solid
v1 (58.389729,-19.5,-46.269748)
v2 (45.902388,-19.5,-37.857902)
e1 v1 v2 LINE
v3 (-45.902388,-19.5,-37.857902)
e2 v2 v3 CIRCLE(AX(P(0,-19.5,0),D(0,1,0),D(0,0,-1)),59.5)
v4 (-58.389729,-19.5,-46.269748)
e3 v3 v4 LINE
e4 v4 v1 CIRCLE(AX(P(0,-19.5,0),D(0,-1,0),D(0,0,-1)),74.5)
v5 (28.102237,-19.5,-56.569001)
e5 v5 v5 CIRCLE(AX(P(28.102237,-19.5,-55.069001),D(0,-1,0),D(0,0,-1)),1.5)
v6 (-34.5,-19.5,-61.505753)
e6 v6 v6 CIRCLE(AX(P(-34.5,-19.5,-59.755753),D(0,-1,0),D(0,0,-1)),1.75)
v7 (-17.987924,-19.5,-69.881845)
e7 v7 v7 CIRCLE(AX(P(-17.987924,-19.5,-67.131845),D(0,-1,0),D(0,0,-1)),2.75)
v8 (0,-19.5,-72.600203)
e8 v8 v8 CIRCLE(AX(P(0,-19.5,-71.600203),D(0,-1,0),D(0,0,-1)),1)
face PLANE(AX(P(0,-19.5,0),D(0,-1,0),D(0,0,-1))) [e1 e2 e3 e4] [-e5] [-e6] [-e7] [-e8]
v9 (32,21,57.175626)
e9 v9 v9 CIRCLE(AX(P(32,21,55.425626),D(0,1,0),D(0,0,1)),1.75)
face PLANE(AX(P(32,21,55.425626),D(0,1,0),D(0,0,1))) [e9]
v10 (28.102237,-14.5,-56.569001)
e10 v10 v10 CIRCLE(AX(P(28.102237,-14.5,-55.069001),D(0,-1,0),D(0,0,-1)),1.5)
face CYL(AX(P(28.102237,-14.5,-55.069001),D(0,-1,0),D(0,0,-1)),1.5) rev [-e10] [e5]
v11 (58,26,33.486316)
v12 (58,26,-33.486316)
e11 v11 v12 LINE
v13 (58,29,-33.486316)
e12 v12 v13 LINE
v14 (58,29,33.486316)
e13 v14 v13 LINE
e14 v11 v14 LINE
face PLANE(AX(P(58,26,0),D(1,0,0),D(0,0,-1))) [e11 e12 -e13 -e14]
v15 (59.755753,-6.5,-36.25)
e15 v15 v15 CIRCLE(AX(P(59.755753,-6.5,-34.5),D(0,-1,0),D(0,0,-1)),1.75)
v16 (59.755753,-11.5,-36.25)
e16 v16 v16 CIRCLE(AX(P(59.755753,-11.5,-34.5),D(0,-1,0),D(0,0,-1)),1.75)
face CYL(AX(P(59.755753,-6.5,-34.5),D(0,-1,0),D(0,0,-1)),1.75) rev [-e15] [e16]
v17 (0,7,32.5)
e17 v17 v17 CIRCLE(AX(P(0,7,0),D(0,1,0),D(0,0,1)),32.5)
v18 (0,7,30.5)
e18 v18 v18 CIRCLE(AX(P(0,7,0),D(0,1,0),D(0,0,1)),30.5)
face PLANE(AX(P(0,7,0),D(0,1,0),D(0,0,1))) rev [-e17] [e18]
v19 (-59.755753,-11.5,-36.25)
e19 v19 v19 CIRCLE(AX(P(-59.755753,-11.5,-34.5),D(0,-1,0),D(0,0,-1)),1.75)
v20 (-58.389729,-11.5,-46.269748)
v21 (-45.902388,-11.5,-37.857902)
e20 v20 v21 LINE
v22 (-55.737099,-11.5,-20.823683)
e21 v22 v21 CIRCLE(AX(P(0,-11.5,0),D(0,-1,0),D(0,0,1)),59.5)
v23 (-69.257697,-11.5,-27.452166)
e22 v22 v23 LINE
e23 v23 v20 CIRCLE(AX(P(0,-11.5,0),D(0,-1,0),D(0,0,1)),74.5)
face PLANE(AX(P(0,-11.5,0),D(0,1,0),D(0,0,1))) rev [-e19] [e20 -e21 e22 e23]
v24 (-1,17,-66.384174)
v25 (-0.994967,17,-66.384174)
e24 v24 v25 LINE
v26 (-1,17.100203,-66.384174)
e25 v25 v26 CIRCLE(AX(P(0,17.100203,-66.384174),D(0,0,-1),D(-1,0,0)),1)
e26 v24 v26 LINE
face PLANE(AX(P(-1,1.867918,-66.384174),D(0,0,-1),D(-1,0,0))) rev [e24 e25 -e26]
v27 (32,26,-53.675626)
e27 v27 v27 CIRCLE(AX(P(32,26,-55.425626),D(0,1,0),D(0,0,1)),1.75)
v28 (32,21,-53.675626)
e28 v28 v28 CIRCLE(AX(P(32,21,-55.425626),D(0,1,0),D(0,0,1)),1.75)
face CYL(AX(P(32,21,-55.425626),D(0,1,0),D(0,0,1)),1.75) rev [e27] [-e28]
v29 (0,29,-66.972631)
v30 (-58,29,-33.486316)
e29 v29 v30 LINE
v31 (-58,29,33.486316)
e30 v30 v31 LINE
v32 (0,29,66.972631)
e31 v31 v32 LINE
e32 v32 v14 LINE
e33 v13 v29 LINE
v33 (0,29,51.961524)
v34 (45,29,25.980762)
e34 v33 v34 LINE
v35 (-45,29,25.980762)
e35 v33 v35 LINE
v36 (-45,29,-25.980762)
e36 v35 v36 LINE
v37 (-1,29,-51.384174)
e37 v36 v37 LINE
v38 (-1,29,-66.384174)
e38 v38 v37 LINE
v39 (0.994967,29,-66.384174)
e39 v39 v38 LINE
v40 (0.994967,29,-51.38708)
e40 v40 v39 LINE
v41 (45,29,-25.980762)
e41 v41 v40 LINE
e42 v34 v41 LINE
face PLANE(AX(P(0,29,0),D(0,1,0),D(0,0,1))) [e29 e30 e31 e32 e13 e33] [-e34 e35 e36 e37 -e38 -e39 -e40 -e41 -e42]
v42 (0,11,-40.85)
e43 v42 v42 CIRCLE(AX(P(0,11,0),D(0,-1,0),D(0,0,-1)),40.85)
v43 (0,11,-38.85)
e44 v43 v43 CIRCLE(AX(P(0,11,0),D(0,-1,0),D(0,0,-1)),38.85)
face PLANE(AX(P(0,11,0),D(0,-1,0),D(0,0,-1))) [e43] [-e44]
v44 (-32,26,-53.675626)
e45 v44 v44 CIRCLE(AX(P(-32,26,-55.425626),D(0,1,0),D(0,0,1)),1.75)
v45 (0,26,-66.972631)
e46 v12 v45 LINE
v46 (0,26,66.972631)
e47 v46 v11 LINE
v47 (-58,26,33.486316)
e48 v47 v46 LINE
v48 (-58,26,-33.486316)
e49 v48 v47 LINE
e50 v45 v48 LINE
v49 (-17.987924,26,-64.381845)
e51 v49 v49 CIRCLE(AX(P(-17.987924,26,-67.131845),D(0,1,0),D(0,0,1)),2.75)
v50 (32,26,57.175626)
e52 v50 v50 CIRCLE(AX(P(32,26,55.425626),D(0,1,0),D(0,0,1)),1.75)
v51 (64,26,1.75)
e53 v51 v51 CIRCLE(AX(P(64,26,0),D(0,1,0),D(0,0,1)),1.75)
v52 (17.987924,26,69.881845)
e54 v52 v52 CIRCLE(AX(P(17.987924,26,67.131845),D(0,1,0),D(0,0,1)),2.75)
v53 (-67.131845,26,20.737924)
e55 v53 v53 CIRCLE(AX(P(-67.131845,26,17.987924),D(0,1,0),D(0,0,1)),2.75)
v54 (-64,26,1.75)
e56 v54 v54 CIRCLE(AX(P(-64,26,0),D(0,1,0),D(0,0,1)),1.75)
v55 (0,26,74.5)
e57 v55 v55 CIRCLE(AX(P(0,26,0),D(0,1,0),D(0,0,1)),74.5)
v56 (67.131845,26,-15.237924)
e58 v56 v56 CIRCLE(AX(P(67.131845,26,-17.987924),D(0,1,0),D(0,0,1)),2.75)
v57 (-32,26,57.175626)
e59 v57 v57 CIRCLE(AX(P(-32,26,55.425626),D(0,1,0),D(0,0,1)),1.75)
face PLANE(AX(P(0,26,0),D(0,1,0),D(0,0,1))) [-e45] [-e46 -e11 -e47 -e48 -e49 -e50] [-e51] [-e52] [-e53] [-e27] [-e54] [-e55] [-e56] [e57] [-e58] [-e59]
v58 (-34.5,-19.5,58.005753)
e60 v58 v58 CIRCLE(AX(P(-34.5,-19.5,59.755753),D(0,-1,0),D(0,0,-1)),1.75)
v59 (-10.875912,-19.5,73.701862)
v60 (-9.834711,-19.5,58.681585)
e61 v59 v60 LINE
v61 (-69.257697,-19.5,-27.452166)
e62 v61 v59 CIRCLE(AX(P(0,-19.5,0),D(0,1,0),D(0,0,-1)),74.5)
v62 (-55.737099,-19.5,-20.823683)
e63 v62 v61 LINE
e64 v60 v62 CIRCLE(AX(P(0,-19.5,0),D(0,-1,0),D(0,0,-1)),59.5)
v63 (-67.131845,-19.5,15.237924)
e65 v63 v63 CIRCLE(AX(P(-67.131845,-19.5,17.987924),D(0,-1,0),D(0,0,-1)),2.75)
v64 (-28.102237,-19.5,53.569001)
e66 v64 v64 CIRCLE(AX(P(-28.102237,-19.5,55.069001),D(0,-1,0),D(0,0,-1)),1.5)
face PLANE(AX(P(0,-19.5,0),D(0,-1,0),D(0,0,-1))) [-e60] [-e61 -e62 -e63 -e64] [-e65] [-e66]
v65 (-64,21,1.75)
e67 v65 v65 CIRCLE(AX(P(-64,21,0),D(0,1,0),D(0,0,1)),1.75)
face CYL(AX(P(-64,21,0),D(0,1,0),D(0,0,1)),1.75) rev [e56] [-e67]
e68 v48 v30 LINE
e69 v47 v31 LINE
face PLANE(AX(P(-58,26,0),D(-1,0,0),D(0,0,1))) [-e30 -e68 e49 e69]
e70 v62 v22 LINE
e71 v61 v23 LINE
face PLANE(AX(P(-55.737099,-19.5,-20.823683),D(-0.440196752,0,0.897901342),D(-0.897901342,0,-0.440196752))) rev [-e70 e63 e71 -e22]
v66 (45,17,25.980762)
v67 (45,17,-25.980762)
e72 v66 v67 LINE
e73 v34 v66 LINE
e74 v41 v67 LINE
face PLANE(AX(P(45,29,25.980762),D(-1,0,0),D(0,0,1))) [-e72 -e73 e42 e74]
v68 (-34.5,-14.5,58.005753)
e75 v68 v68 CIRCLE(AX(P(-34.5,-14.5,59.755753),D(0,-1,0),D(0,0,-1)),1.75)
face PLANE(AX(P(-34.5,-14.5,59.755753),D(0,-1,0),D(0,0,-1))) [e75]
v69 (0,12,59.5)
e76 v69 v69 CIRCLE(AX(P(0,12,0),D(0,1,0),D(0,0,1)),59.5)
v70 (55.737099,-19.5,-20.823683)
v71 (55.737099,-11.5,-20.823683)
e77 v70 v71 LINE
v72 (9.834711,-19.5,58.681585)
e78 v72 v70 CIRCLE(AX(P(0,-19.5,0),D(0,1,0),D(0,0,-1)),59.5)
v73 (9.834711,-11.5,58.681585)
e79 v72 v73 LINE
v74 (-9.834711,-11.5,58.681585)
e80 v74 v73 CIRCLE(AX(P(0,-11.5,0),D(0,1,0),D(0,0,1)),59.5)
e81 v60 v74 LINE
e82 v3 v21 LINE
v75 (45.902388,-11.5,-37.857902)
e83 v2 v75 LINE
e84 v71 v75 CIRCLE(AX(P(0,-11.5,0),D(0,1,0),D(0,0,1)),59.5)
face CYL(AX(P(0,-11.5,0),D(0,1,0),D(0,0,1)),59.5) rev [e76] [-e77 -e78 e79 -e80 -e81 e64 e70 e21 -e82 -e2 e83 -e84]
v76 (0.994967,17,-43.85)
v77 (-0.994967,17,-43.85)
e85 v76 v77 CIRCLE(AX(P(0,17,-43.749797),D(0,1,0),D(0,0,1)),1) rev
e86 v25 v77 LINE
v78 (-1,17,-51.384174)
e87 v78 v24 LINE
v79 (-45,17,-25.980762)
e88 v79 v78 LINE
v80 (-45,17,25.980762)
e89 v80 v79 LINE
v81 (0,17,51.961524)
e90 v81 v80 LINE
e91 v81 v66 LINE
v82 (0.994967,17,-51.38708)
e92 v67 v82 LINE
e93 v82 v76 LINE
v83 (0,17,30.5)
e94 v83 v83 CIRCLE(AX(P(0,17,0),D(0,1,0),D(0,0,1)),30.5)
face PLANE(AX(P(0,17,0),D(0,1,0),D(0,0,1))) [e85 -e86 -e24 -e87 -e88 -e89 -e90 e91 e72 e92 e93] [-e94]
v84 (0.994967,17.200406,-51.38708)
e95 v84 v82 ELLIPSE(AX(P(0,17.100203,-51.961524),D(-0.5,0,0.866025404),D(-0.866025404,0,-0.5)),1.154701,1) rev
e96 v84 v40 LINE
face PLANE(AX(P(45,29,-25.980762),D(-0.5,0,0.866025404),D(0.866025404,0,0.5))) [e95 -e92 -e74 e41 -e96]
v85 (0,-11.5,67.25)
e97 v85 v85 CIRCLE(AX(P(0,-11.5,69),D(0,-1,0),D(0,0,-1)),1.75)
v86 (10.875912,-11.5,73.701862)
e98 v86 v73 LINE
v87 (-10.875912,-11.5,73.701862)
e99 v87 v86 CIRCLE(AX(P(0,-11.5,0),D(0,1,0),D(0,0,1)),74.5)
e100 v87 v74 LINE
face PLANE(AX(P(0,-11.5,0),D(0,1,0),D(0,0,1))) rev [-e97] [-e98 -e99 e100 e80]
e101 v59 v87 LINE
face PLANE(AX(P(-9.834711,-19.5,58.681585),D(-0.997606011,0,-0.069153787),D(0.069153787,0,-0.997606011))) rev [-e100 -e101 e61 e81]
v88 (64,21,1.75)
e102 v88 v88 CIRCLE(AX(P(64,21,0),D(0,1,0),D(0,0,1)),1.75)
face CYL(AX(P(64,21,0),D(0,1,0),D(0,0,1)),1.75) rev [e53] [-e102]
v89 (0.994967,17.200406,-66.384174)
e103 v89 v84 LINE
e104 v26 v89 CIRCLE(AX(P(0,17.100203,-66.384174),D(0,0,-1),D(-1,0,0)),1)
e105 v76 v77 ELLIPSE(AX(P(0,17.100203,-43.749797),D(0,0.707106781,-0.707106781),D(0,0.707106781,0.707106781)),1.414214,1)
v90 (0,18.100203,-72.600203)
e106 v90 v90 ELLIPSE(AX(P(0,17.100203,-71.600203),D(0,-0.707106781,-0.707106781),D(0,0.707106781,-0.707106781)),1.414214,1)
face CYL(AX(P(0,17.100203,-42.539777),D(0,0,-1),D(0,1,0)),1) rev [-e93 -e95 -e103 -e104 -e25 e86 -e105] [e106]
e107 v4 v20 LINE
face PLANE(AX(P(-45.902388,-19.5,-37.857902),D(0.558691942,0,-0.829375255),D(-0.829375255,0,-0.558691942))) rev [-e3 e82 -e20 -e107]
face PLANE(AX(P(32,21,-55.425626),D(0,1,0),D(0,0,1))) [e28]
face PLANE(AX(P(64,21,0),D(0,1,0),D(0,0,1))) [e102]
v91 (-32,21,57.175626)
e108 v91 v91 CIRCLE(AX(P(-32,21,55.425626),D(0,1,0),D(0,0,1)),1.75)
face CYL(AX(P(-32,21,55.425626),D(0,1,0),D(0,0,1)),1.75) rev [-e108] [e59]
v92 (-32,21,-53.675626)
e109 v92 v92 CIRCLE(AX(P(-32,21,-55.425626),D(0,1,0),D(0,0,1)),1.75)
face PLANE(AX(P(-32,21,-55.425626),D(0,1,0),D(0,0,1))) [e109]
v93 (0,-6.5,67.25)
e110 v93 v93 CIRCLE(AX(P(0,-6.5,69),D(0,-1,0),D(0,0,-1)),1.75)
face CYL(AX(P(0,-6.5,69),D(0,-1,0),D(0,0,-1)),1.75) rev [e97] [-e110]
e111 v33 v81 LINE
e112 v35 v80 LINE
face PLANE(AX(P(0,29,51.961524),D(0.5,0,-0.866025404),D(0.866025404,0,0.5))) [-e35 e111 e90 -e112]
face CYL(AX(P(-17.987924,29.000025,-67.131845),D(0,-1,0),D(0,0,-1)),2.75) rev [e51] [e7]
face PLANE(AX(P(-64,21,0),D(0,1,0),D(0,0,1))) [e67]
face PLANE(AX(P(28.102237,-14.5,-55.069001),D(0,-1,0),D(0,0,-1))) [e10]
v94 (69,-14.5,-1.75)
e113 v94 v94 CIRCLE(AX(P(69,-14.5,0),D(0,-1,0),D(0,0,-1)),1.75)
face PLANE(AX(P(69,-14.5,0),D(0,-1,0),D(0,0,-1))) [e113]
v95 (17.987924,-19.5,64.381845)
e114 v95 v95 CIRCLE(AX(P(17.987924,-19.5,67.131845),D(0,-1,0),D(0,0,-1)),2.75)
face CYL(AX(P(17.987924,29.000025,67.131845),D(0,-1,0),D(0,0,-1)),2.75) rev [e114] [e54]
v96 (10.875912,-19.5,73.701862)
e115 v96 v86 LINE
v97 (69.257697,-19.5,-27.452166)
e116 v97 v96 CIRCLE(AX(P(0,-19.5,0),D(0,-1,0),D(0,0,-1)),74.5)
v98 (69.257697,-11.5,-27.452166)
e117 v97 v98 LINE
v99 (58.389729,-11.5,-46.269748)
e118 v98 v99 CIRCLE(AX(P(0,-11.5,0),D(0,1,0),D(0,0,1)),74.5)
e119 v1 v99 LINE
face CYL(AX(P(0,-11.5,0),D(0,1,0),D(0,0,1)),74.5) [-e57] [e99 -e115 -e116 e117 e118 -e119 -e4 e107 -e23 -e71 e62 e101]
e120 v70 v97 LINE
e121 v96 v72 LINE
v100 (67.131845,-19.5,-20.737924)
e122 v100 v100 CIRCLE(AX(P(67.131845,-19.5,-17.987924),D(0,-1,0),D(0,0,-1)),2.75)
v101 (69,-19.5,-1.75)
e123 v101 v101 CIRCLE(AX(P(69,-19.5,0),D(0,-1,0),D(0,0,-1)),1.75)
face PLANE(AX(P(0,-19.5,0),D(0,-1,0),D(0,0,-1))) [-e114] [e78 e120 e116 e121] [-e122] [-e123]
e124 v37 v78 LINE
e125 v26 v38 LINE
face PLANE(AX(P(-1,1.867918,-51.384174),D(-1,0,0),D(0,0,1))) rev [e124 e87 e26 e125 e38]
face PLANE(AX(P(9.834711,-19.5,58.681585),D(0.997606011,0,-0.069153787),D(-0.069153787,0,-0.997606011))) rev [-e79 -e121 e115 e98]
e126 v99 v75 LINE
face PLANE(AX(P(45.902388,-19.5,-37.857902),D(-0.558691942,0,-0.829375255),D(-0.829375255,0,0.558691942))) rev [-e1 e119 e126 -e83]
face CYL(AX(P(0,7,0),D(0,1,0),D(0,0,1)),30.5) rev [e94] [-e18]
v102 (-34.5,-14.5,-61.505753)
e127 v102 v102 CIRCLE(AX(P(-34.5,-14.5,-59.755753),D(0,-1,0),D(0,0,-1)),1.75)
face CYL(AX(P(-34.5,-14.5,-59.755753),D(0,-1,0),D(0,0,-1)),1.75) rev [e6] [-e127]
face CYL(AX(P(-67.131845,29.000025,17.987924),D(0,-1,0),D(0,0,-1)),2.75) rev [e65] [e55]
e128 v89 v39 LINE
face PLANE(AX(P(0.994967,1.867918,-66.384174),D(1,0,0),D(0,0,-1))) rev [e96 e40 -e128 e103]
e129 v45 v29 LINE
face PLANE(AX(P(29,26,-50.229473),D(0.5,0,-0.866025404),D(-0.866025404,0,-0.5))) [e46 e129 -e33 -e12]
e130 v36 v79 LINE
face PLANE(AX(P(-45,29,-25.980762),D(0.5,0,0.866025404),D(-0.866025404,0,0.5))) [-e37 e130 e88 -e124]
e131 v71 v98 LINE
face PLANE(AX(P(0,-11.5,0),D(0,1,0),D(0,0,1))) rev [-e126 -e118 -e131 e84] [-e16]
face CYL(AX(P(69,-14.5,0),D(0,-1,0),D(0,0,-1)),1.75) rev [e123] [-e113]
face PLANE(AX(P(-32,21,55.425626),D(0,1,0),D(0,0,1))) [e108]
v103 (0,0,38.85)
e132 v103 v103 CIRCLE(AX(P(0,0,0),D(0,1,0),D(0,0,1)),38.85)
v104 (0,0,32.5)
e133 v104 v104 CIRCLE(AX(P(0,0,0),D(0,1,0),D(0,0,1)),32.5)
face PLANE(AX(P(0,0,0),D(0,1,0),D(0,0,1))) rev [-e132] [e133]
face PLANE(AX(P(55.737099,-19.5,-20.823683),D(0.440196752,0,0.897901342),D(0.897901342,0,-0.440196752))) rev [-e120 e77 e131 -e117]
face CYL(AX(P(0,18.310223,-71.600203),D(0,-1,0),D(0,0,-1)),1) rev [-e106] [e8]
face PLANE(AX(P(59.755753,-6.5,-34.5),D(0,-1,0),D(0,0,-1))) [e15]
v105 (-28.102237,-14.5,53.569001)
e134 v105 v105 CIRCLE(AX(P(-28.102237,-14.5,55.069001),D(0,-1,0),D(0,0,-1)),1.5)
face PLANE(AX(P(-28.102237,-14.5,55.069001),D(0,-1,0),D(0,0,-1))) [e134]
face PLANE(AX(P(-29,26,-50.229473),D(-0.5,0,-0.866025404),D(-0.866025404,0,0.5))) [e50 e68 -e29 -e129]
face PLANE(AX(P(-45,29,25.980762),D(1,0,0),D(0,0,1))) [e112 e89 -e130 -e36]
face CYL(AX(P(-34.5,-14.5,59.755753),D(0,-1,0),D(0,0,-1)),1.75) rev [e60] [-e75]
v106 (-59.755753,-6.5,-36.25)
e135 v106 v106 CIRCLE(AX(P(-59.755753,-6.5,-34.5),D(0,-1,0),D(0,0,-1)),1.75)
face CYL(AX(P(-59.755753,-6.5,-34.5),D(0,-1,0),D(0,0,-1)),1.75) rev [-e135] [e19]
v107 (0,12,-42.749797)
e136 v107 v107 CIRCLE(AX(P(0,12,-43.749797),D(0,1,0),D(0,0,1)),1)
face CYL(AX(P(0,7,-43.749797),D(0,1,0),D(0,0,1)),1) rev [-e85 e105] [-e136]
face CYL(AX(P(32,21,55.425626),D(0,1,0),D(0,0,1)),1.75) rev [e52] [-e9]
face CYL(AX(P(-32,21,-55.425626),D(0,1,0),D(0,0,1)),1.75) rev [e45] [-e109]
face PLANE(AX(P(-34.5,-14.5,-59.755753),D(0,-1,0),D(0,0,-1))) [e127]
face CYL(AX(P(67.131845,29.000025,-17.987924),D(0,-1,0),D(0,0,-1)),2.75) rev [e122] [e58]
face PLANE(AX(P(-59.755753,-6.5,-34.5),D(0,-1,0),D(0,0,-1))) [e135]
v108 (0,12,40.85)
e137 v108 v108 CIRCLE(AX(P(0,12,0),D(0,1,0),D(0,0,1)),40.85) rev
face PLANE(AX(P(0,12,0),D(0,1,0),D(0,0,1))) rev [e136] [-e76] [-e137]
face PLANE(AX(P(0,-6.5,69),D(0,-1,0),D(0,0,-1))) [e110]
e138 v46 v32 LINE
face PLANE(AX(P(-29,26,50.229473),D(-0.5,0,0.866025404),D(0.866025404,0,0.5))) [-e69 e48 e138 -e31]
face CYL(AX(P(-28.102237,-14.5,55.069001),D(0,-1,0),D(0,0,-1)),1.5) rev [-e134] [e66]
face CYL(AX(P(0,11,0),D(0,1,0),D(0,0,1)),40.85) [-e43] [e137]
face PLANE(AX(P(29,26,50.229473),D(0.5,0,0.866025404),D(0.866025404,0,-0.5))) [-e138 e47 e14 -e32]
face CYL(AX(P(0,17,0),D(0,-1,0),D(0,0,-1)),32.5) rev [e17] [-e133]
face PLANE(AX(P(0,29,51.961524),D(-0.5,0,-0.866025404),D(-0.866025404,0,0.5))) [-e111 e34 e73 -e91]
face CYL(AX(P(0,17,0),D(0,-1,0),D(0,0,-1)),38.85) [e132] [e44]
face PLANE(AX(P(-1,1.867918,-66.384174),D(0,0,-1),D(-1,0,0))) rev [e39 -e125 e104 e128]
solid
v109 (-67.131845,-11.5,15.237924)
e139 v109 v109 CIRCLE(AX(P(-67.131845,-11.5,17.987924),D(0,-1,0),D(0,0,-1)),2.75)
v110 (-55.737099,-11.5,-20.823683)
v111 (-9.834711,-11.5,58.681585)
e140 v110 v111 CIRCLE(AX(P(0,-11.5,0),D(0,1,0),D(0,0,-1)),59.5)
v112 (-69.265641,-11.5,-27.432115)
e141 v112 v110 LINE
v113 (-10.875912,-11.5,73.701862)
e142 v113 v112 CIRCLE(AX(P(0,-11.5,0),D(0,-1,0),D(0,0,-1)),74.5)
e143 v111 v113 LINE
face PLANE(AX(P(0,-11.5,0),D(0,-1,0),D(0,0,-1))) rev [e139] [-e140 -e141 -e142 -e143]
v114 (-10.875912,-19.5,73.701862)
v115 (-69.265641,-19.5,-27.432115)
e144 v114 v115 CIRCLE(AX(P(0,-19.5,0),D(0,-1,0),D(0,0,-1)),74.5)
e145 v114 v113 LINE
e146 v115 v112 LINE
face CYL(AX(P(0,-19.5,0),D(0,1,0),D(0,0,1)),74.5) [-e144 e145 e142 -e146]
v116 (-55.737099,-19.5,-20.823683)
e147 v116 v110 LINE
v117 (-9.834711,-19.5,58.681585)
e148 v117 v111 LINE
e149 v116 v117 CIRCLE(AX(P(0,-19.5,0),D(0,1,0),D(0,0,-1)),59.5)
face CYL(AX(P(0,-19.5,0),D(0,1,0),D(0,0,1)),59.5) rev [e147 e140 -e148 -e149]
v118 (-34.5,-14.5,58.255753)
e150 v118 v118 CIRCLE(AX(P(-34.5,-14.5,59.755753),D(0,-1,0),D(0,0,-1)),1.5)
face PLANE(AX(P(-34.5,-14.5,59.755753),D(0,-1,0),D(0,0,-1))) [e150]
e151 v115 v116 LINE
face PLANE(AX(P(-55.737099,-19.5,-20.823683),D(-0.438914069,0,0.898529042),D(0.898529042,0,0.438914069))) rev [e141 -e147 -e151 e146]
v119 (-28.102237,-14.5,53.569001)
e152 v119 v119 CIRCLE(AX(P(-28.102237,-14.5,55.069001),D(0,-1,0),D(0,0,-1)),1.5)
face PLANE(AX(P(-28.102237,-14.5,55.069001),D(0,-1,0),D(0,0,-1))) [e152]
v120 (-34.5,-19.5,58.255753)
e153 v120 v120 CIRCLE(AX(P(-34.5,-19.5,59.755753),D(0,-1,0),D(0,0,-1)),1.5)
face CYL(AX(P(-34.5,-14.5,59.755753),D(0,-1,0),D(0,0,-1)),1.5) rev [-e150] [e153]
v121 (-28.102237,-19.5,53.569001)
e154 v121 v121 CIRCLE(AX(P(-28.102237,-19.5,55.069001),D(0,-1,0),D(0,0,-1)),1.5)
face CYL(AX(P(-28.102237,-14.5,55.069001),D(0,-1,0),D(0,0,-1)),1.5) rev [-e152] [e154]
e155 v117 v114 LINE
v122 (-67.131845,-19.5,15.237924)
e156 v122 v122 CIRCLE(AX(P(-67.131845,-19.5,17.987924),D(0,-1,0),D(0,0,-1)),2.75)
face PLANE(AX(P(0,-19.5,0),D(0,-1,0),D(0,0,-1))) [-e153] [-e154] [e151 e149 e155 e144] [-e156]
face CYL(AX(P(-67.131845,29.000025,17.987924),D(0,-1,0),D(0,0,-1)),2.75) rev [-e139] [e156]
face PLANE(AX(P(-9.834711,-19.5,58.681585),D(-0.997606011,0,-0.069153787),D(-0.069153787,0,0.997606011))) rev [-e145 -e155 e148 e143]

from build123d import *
from build123d.topology import SkipClean

# Parameters (mm, degrees)
CROQUIS1_R                 = 38.85
CROQUIS1_R_2               = 32.5
SALIENTE_EXTRUIR1_DEPTH    = 17
CROQUIS3_R                 = 59.5
CROQUIS3_R_2               = 38.85
SALIENTE_EXTRUIR2_DEPTH    = 5
CROQUIS4_R                 = 74.5
CROQUIS4_R_2               = 59.5
SALIENTE_EXTRUIR3_DEPTH    = 28.5
SALIENTE_EXTRUIR4_START    = 12
CROQUIS5_R                 = 74.5
SALIENTE_EXTRUIR4_DEPTH    = 12
CROQUIS6_R                 = 32.5
CROQUIS6_R_2               = 30.5
SALIENTE_EXTRUIR5_DEPTH    = 10
SALIENTE_EXTRUIR6_START    = 1
CROQUIS9_R                 = 40.85
CROQUIS9_R_2               = 38.85
SALIENTE_EXTRUIR6_DEPTH    = 1
CORTAR_EXTRUIR1_DEPTH      = 110.277170534
CORTAR_EXTRUIR1_DEPTH_BACK = 110.277170534
SALIENTE_EXTRUIR7_DEPTH    = 8
CROQUIS12_R                = 1
CROQUIS14_R                = 1.75
CORTAR_EXTRUIR2_DEPTH      = 5
CROQUIS15_R                = 74.5
CROQUIS15_R_2              = 32
CORTAR_EXTRUIR4_DEPTH      = 3
CROQUIS16_R                = 1.75
CORTAR_EXTRUIR5_DEPTH      = 5
CROQUIS18_R                = 1.75
CORTAR_EXTRUIR6_DEPTH      = 5
CORTAR_EXTRUIR7_START      = -12
CORTAR_EXTRUIR7_DEPTH      = 12
CROQUIS21_R                = 1.5
CORTAR_EXTRUIR8_DEPTH      = 5
CROQUIS22_R                = 2.75
CORTAR_EXTRUIR9_DEPTH      = 116.985990533
SKETCH1_R                  = 1.5
CUT_EXTRUDE1_DEPTH         = 5


# Read off the part's stored shape, not the designer's step: Cortar-Extruir7
with BuildPart() as part:
    # Croquis1 → Saliente-Extruir1 (new body)
    with BuildSketch(Plane(origin=(0, 0, 0), x_dir=(1, 0, 0), z_dir=(0, 1, 0))):
        with Locations(Location((0, 0, 0), (0, 0, 270))):
            Circle(CROQUIS1_R)
        with Locations(Location((0, 0, 0), (0, 0, 270))):
            Circle(CROQUIS1_R_2, mode=Mode.SUBTRACT)
    extrude(amount=SALIENTE_EXTRUIR1_DEPTH)



with BuildPart() as body_2:
    # Croquis3 → Saliente-Extruir2 (new body)
    with BuildSketch(Plane(origin=(0, 17, 0), x_dir=(1, 0, 0), z_dir=(0, 1, 0))):
        with Locations(Location((0, 0, 0), (0, 0, 270))):
            Circle(CROQUIS3_R)
        with Locations(Location((0, 0, 0), (0, 0, 270))):
            Circle(CROQUIS3_R_2, mode=Mode.SUBTRACT)
    extrude(amount=-SALIENTE_EXTRUIR2_DEPTH)


with BuildPart() as part_1:
    add(part.part)

    add(body_2.part)  # Saliente-Extruir3 merges body 2
    # Croquis4 → Saliente-Extruir3 (add)
    with BuildSketch(Plane(origin=(0, 17, 0), x_dir=(1, 0, 0), z_dir=(0, 1, 0))):
        with Locations(Location((0, 0, 0), (0, 0, 270))):
            Circle(CROQUIS4_R)
        with Locations(Location((0, 0, 0), (0, 0, 270))):
            Circle(CROQUIS4_R_2, mode=Mode.SUBTRACT)
    extrude(amount=-SALIENTE_EXTRUIR3_DEPTH)

    # Croquis5 → Saliente-Extruir4 (add)
    with BuildSketch(Plane(origin=(0, 17, 0), x_dir=(1, 0, 0), z_dir=(0, 1, 0)).offset(SALIENTE_EXTRUIR4_START)):
        with Locations(Location((0, 0, 0), (0, 0, 270))):
            Circle(CROQUIS5_R)
        Polygon((0, 51.961524227), (-45, 25.980762114), (-45, -25.980762114), (0, -51.961524227), (45, -25.980762114), (45, 25.980762114), align=None, mode=Mode.SUBTRACT)
    extrude(amount=-SALIENTE_EXTRUIR4_DEPTH)


with BuildPart() as body_2_2:
    # Croquis6 → Saliente-Extruir5 (new body)
    with BuildSketch(Plane(origin=(0, 17, 0), x_dir=(1, 0, 0), z_dir=(0, 1, 0))):
        with Locations(Location((0, 0, 0), (0, 0, 270))):
            Circle(CROQUIS6_R)
        with Locations(Location((0, 0, 0), (0, 0, 270))):
            Circle(CROQUIS6_R_2, mode=Mode.SUBTRACT)
    extrude(amount=-SALIENTE_EXTRUIR5_DEPTH)


    add(part_1.part)  # Saliente-Extruir6 merges part
    # Croquis9 → Saliente-Extruir6 (add)
    with BuildSketch(Plane(origin=(0, 12, 0), x_dir=(-1, 0, 0), z_dir=(0, -1, 0)).offset(SALIENTE_EXTRUIR6_START)):
        with Locations(Location((0, 0, 0), (0, 0, 270))):
            Circle(CROQUIS9_R)
        with Locations(Location((0, 0, 0), (0, 0, 90))):
            Circle(CROQUIS9_R_2, mode=Mode.SUBTRACT)
    extrude(amount=-SALIENTE_EXTRUIR6_DEPTH)

    # Croquis10 → Cortar-Extruir1 (cut, two sides: drawn at the far end of the back side and taken through both)
    with BuildSketch(Plane.XZ.offset(-CORTAR_EXTRUIR1_DEPTH_BACK)):
        with BuildLine():
            Line((0, 0), (0, 93.15188238))
            ThreePointArc((0, 93.15188238), (-93.15188238, 0), (0, -93.15188238))
            Line((0, -93.15188238), (0, 0))
        make_face()
    extrude(amount=CORTAR_EXTRUIR1_DEPTH + CORTAR_EXTRUIR1_DEPTH_BACK, mode=Mode.SUBTRACT)

    # Croquis17 → Saliente-Extruir7 (add)
    with SkipClean():  # the faces are left unmerged after this step: merging them gives an invalid solid
        with BuildSketch(Plane(origin=(0, -11.5, 0), x_dir=(-1, 0, 0), z_dir=(0, -1, 0))):
            with BuildLine():
                Line((55.737099059, 20.823683355), (69.265641396, 27.432114792))
                ThreePointArc((69.265641396, 27.432114792), (64.518892582, -37.25), (10.875912409, -73.701862455))
                Line((10.875912409, -73.701862455), (9.834710744, -58.681585396))
                ThreePointArc((9.834710744, -58.681585396), (51.528511525, -29.75), (55.737099059, 20.823683355))
            make_face()
            with BuildLine():
                Line((45.902388315, 37.857902041), (58.389728988, 46.269747663))
                ThreePointArc((58.389728988, 46.269747663), (0, 74.5), (-58.389728988, 46.269747663))
                Line((-58.389728988, 46.269747663), (-45.902388315, 37.857902041))
                ThreePointArc((-45.902388315, 37.857902041), (0, 59.5), (45.902388315, 37.857902041))
            make_face()
            with BuildLine():
                Line((-55.737099059, 20.823683355), (-69.257696989, 27.452165812))
                ThreePointArc((-69.257696989, 27.452165812), (-64.524283781, -37.240660609), (-10.875912409, -73.701862455))
                Line((-10.875912409, -73.701862455), (-9.834710744, -58.681585396))
                ThreePointArc((-9.834710744, -58.681585396), (-51.528511525, -29.75), (-55.737099059, 20.823683355))
            make_face()
        extrude(amount=SALIENTE_EXTRUIR7_DEPTH)


with BuildPart() as saliente_extruir7_piece_1:
    # of the separate pieces the step leaves, piece 1, a body of its own (saliente_extruir7_pieces)
    add(body_2_2.part.solids().sort_by_distance((0, 17, 51.961524227))[0])

    # Cortar-Barrer1: sweep along a path in Croquis11
    with SkipClean():  # the faces are left unmerged after this step: merging them gives an invalid solid
        with BuildLine(Plane.ZY) as cortar_barrer1_path:
            Line((-43.85, 12), (-43.85, 17))
            Line((-43.85, 17), (-71.5, 17))
            Line((-71.5, 17), (-71.5, -19.5))
        # Croquis12 → Cortar-Barrer1 (sweep, cut)
        with BuildSketch(Plane(origin=(0, 12, 0), x_dir=(-1, 0, 0), z_dir=(0, -1, 0))):
            with Locations((0, 43.74979684)):
                Circle(CROQUIS12_R)
        sweep(path=cortar_barrer1_path.line, transition=Transition.RIGHT, mode=Mode.SUBTRACT)

    # Simetría2: Saliente-Extruir7 piece 1 across plane


with BuildPart() as saliente_extruir7_piece_2:
    # of the separate pieces the step leaves, piece 2, a body of its own (saliente_extruir7_pieces)
    add(body_2_2.part.solids().sort_by_distance((-55.737099059, -11.5, -20.823683355))[0])

    # Croquis21 → Cortar-Extruir8 (cut)
    with BuildSketch(Plane.XZ.offset(19.5)):
        with Locations(Location((-34.5, 59.755752861, 0), (0, 0, 270))):
            Circle(CROQUIS21_R)
    extrude(amount=-CORTAR_EXTRUIR8_DEPTH, mode=Mode.SUBTRACT)


with BuildPart() as saliente_extruir7_piece_1_1:
    with SkipClean():  # the faces are left unmerged after this step: merging them gives an invalid solid
        add(saliente_extruir7_piece_1.part)
        add(saliente_extruir7_piece_1.part.mirror(Plane(origin=(0, 29, 0), x_dir=(0, 0, 1), z_dir=(1, 0, 0))))

    # Croquis14 → Cortar-Extruir2 (cut)
    with SkipClean():  # the faces are left unmerged after this step: merging them gives an invalid solid
        with BuildSketch(Plane.XZ.offset(11.5)):
            with Locations(Location((0, 69, 0), (0, 0, 270))):
                Circle(CROQUIS14_R)
            with Locations(Location((59.755752861, -34.5, 0), (0, 0, 270))):
                Circle(CROQUIS14_R)
            with Locations(Location((-59.755752861, -34.5, 0), (0, 0, 270))):
                Circle(CROQUIS14_R)
        extrude(amount=-CORTAR_EXTRUIR2_DEPTH, mode=Mode.SUBTRACT)

    # Croquis15 → Cortar-Extruir4 (cut)
    # profile 1 of 2: a face of its own
    with SkipClean():  # the faces are left unmerged after this step: merging them gives an invalid solid
        with BuildSketch(Plane(origin=(0, 29, 0), x_dir=(1, 0, 0), z_dir=(0, 1, 0))):
            with Locations(Location((0, 0, 0), (0, 0, 270))):
                Circle(CROQUIS15_R)
            Polygon((-58, -33.486315613), (0, -66.972631226), (58, -33.486315613), (58, 33.486315613), (0, 66.972631226), (-58, 33.486315613), align=None, mode=Mode.SUBTRACT)
        # profile 2 of 2: a face of its own
        with BuildSketch(Plane(origin=(0, 29, 0), x_dir=(1, 0, 0), z_dir=(0, 1, 0))):
            Circle(CROQUIS15_R_2)
        extrude(amount=-CORTAR_EXTRUIR4_DEPTH, mode=Mode.SUBTRACT)

    # Croquis16 → Cortar-Extruir5 (cut)
    with SkipClean():  # the faces are left unmerged after this step: merging them gives an invalid solid
        with BuildSketch(Plane(origin=(0, 26, 0), x_dir=(1, 0, 0), z_dir=(0, 1, 0))):
            with Locations(Location((-64, 0, 0), (0, 0, 270))):
                Circle(CROQUIS16_R)
            with Locations(Location((-32, 55.425625842, 0), (0, 0, 270))):
                Circle(CROQUIS16_R)
            with Locations(Location((32, 55.425625842, 0), (0, 0, 270))):
                Circle(CROQUIS16_R)
            with Locations(Location((64, 0, 0), (0, 0, 270))):
                Circle(CROQUIS16_R)
            with Locations(Location((32, -55.425625842, 0), (0, 0, 270))):
                Circle(CROQUIS16_R)
            with Locations(Location((-32, -55.425625842, 0), (0, 0, 270))):
                Circle(CROQUIS16_R)
        extrude(amount=-CORTAR_EXTRUIR5_DEPTH, mode=Mode.SUBTRACT)

    # Croquis18 → Cortar-Extruir6 (cut)
    with SkipClean():  # the faces are left unmerged after this step: merging them gives an invalid solid
        with BuildSketch(Plane(origin=(0, -19.5, 0), x_dir=(-1, 0, 0), z_dir=(0, -1, 0))):
            with Locations(Location((34.5, -59.755752861, 0), (0, 0, 90))):
                Circle(CROQUIS18_R)
            with Locations(Location((-69, 0, 0), (0, 0, 90))):
                Circle(CROQUIS18_R)
            with Locations(Location((34.5, 59.755752861, 0), (0, 0, 90))):
                Circle(CROQUIS18_R)
        extrude(amount=-CORTAR_EXTRUIR6_DEPTH, mode=Mode.SUBTRACT)

    # Cortar-Extruir7 outline → Cortar-Extruir7 (cut)
    with SkipClean():  # the faces are left unmerged after this step: merging them gives an invalid solid
        with BuildSketch(Plane(origin=(0, 29, 0), x_dir=(1, 0, 0), z_dir=(0, 1, 0)).offset(CORTAR_EXTRUIR7_START)):
            Polygon((0.994966998, 51.387079763), (0.994966998, 66.384173958), (-1, 66.384173958), (-1, 51.384173958), (0, 51.961524227), align=None)
        extrude(amount=CORTAR_EXTRUIR7_DEPTH, mode=Mode.SUBTRACT)


with BuildPart() as cortar_extruir9_tool:
    # Croquis22 → Cortar-Extruir9 (new, through all)
    with SkipClean():  # the faces are left unmerged after this step: merging them gives an invalid solid
        with BuildSketch(Plane.XZ.offset(19.5)):
            with Locations(Location((17.987923635, 67.131844927, 0), (0, 0, 270))):
                Circle(CROQUIS22_R)
            with Locations(Location((67.131844927, -17.987923635, 0), (0, 0, 270))):
                Circle(CROQUIS22_R)
            with Locations(Location((-17.987923635, -67.131844927, 0), (0, 0, 270))):
                Circle(CROQUIS22_R)
            with Locations(Location((-67.131844927, 17.987923635, 0), (0, 0, 270))):
                Circle(CROQUIS22_R)
        extrude(amount=-CORTAR_EXTRUIR9_DEPTH)


with BuildPart() as saliente_extruir7_piece_1_2:
    with SkipClean():  # the faces are left unmerged after this step: merging them gives an invalid solid
        add(saliente_extruir7_piece_1_1.part)

        # Cortar-Extruir9: cut by cortar_extruir9_tool
        add(cortar_extruir9_tool.part, mode=Mode.SUBTRACT)


with BuildPart() as saliente_extruir7_piece_2_1:
    with SkipClean():  # the faces are left unmerged after this step: merging them gives an invalid solid
        add(saliente_extruir7_piece_2.part)

        # Cortar-Extruir9: cut by cortar_extruir9_tool
        add(cortar_extruir9_tool.part, mode=Mode.SUBTRACT)


with BuildPart() as cut_extrude1_tool:
    # Sketch1 → Cut-Extrude1 (new body)
    with SkipClean():  # the faces are left unmerged after this step: merging them gives an invalid solid
        with BuildSketch(Plane(origin=(0, -19.5, 0), x_dir=(-1, 0, 0), z_dir=(0, -1, 0))):
            with Locations(Location((-28.102236634, 55.069001454, 0), (0, 0, 90))):
                Circle(SKETCH1_R)
            with Locations(Location((28.102236634, -55.069001454, 0), (0, 0, 90))):
                Circle(SKETCH1_R)
        extrude(amount=-CUT_EXTRUDE1_DEPTH)


with BuildPart() as saliente_extruir7_piece_1_3:
    with SkipClean():  # the faces are left unmerged after this step: merging them gives an invalid solid
        add(saliente_extruir7_piece_1_2.part)

        # Cut-Extrude1: cut by cut_extrude1_tool
        add(cut_extrude1_tool.part, mode=Mode.SUBTRACT)


with BuildPart() as saliente_extruir7_piece_2_2:
    with SkipClean():  # the faces are left unmerged after this step: merging them gives an invalid solid
        add(saliente_extruir7_piece_2_1.part)

        # Cut-Extrude1: cut by cut_extrude1_tool
        add(cut_extrude1_tool.part, mode=Mode.SUBTRACT)


solid = Compound([saliente_extruir7_piece_1_3.part, saliente_extruir7_piece_2_2.part])
